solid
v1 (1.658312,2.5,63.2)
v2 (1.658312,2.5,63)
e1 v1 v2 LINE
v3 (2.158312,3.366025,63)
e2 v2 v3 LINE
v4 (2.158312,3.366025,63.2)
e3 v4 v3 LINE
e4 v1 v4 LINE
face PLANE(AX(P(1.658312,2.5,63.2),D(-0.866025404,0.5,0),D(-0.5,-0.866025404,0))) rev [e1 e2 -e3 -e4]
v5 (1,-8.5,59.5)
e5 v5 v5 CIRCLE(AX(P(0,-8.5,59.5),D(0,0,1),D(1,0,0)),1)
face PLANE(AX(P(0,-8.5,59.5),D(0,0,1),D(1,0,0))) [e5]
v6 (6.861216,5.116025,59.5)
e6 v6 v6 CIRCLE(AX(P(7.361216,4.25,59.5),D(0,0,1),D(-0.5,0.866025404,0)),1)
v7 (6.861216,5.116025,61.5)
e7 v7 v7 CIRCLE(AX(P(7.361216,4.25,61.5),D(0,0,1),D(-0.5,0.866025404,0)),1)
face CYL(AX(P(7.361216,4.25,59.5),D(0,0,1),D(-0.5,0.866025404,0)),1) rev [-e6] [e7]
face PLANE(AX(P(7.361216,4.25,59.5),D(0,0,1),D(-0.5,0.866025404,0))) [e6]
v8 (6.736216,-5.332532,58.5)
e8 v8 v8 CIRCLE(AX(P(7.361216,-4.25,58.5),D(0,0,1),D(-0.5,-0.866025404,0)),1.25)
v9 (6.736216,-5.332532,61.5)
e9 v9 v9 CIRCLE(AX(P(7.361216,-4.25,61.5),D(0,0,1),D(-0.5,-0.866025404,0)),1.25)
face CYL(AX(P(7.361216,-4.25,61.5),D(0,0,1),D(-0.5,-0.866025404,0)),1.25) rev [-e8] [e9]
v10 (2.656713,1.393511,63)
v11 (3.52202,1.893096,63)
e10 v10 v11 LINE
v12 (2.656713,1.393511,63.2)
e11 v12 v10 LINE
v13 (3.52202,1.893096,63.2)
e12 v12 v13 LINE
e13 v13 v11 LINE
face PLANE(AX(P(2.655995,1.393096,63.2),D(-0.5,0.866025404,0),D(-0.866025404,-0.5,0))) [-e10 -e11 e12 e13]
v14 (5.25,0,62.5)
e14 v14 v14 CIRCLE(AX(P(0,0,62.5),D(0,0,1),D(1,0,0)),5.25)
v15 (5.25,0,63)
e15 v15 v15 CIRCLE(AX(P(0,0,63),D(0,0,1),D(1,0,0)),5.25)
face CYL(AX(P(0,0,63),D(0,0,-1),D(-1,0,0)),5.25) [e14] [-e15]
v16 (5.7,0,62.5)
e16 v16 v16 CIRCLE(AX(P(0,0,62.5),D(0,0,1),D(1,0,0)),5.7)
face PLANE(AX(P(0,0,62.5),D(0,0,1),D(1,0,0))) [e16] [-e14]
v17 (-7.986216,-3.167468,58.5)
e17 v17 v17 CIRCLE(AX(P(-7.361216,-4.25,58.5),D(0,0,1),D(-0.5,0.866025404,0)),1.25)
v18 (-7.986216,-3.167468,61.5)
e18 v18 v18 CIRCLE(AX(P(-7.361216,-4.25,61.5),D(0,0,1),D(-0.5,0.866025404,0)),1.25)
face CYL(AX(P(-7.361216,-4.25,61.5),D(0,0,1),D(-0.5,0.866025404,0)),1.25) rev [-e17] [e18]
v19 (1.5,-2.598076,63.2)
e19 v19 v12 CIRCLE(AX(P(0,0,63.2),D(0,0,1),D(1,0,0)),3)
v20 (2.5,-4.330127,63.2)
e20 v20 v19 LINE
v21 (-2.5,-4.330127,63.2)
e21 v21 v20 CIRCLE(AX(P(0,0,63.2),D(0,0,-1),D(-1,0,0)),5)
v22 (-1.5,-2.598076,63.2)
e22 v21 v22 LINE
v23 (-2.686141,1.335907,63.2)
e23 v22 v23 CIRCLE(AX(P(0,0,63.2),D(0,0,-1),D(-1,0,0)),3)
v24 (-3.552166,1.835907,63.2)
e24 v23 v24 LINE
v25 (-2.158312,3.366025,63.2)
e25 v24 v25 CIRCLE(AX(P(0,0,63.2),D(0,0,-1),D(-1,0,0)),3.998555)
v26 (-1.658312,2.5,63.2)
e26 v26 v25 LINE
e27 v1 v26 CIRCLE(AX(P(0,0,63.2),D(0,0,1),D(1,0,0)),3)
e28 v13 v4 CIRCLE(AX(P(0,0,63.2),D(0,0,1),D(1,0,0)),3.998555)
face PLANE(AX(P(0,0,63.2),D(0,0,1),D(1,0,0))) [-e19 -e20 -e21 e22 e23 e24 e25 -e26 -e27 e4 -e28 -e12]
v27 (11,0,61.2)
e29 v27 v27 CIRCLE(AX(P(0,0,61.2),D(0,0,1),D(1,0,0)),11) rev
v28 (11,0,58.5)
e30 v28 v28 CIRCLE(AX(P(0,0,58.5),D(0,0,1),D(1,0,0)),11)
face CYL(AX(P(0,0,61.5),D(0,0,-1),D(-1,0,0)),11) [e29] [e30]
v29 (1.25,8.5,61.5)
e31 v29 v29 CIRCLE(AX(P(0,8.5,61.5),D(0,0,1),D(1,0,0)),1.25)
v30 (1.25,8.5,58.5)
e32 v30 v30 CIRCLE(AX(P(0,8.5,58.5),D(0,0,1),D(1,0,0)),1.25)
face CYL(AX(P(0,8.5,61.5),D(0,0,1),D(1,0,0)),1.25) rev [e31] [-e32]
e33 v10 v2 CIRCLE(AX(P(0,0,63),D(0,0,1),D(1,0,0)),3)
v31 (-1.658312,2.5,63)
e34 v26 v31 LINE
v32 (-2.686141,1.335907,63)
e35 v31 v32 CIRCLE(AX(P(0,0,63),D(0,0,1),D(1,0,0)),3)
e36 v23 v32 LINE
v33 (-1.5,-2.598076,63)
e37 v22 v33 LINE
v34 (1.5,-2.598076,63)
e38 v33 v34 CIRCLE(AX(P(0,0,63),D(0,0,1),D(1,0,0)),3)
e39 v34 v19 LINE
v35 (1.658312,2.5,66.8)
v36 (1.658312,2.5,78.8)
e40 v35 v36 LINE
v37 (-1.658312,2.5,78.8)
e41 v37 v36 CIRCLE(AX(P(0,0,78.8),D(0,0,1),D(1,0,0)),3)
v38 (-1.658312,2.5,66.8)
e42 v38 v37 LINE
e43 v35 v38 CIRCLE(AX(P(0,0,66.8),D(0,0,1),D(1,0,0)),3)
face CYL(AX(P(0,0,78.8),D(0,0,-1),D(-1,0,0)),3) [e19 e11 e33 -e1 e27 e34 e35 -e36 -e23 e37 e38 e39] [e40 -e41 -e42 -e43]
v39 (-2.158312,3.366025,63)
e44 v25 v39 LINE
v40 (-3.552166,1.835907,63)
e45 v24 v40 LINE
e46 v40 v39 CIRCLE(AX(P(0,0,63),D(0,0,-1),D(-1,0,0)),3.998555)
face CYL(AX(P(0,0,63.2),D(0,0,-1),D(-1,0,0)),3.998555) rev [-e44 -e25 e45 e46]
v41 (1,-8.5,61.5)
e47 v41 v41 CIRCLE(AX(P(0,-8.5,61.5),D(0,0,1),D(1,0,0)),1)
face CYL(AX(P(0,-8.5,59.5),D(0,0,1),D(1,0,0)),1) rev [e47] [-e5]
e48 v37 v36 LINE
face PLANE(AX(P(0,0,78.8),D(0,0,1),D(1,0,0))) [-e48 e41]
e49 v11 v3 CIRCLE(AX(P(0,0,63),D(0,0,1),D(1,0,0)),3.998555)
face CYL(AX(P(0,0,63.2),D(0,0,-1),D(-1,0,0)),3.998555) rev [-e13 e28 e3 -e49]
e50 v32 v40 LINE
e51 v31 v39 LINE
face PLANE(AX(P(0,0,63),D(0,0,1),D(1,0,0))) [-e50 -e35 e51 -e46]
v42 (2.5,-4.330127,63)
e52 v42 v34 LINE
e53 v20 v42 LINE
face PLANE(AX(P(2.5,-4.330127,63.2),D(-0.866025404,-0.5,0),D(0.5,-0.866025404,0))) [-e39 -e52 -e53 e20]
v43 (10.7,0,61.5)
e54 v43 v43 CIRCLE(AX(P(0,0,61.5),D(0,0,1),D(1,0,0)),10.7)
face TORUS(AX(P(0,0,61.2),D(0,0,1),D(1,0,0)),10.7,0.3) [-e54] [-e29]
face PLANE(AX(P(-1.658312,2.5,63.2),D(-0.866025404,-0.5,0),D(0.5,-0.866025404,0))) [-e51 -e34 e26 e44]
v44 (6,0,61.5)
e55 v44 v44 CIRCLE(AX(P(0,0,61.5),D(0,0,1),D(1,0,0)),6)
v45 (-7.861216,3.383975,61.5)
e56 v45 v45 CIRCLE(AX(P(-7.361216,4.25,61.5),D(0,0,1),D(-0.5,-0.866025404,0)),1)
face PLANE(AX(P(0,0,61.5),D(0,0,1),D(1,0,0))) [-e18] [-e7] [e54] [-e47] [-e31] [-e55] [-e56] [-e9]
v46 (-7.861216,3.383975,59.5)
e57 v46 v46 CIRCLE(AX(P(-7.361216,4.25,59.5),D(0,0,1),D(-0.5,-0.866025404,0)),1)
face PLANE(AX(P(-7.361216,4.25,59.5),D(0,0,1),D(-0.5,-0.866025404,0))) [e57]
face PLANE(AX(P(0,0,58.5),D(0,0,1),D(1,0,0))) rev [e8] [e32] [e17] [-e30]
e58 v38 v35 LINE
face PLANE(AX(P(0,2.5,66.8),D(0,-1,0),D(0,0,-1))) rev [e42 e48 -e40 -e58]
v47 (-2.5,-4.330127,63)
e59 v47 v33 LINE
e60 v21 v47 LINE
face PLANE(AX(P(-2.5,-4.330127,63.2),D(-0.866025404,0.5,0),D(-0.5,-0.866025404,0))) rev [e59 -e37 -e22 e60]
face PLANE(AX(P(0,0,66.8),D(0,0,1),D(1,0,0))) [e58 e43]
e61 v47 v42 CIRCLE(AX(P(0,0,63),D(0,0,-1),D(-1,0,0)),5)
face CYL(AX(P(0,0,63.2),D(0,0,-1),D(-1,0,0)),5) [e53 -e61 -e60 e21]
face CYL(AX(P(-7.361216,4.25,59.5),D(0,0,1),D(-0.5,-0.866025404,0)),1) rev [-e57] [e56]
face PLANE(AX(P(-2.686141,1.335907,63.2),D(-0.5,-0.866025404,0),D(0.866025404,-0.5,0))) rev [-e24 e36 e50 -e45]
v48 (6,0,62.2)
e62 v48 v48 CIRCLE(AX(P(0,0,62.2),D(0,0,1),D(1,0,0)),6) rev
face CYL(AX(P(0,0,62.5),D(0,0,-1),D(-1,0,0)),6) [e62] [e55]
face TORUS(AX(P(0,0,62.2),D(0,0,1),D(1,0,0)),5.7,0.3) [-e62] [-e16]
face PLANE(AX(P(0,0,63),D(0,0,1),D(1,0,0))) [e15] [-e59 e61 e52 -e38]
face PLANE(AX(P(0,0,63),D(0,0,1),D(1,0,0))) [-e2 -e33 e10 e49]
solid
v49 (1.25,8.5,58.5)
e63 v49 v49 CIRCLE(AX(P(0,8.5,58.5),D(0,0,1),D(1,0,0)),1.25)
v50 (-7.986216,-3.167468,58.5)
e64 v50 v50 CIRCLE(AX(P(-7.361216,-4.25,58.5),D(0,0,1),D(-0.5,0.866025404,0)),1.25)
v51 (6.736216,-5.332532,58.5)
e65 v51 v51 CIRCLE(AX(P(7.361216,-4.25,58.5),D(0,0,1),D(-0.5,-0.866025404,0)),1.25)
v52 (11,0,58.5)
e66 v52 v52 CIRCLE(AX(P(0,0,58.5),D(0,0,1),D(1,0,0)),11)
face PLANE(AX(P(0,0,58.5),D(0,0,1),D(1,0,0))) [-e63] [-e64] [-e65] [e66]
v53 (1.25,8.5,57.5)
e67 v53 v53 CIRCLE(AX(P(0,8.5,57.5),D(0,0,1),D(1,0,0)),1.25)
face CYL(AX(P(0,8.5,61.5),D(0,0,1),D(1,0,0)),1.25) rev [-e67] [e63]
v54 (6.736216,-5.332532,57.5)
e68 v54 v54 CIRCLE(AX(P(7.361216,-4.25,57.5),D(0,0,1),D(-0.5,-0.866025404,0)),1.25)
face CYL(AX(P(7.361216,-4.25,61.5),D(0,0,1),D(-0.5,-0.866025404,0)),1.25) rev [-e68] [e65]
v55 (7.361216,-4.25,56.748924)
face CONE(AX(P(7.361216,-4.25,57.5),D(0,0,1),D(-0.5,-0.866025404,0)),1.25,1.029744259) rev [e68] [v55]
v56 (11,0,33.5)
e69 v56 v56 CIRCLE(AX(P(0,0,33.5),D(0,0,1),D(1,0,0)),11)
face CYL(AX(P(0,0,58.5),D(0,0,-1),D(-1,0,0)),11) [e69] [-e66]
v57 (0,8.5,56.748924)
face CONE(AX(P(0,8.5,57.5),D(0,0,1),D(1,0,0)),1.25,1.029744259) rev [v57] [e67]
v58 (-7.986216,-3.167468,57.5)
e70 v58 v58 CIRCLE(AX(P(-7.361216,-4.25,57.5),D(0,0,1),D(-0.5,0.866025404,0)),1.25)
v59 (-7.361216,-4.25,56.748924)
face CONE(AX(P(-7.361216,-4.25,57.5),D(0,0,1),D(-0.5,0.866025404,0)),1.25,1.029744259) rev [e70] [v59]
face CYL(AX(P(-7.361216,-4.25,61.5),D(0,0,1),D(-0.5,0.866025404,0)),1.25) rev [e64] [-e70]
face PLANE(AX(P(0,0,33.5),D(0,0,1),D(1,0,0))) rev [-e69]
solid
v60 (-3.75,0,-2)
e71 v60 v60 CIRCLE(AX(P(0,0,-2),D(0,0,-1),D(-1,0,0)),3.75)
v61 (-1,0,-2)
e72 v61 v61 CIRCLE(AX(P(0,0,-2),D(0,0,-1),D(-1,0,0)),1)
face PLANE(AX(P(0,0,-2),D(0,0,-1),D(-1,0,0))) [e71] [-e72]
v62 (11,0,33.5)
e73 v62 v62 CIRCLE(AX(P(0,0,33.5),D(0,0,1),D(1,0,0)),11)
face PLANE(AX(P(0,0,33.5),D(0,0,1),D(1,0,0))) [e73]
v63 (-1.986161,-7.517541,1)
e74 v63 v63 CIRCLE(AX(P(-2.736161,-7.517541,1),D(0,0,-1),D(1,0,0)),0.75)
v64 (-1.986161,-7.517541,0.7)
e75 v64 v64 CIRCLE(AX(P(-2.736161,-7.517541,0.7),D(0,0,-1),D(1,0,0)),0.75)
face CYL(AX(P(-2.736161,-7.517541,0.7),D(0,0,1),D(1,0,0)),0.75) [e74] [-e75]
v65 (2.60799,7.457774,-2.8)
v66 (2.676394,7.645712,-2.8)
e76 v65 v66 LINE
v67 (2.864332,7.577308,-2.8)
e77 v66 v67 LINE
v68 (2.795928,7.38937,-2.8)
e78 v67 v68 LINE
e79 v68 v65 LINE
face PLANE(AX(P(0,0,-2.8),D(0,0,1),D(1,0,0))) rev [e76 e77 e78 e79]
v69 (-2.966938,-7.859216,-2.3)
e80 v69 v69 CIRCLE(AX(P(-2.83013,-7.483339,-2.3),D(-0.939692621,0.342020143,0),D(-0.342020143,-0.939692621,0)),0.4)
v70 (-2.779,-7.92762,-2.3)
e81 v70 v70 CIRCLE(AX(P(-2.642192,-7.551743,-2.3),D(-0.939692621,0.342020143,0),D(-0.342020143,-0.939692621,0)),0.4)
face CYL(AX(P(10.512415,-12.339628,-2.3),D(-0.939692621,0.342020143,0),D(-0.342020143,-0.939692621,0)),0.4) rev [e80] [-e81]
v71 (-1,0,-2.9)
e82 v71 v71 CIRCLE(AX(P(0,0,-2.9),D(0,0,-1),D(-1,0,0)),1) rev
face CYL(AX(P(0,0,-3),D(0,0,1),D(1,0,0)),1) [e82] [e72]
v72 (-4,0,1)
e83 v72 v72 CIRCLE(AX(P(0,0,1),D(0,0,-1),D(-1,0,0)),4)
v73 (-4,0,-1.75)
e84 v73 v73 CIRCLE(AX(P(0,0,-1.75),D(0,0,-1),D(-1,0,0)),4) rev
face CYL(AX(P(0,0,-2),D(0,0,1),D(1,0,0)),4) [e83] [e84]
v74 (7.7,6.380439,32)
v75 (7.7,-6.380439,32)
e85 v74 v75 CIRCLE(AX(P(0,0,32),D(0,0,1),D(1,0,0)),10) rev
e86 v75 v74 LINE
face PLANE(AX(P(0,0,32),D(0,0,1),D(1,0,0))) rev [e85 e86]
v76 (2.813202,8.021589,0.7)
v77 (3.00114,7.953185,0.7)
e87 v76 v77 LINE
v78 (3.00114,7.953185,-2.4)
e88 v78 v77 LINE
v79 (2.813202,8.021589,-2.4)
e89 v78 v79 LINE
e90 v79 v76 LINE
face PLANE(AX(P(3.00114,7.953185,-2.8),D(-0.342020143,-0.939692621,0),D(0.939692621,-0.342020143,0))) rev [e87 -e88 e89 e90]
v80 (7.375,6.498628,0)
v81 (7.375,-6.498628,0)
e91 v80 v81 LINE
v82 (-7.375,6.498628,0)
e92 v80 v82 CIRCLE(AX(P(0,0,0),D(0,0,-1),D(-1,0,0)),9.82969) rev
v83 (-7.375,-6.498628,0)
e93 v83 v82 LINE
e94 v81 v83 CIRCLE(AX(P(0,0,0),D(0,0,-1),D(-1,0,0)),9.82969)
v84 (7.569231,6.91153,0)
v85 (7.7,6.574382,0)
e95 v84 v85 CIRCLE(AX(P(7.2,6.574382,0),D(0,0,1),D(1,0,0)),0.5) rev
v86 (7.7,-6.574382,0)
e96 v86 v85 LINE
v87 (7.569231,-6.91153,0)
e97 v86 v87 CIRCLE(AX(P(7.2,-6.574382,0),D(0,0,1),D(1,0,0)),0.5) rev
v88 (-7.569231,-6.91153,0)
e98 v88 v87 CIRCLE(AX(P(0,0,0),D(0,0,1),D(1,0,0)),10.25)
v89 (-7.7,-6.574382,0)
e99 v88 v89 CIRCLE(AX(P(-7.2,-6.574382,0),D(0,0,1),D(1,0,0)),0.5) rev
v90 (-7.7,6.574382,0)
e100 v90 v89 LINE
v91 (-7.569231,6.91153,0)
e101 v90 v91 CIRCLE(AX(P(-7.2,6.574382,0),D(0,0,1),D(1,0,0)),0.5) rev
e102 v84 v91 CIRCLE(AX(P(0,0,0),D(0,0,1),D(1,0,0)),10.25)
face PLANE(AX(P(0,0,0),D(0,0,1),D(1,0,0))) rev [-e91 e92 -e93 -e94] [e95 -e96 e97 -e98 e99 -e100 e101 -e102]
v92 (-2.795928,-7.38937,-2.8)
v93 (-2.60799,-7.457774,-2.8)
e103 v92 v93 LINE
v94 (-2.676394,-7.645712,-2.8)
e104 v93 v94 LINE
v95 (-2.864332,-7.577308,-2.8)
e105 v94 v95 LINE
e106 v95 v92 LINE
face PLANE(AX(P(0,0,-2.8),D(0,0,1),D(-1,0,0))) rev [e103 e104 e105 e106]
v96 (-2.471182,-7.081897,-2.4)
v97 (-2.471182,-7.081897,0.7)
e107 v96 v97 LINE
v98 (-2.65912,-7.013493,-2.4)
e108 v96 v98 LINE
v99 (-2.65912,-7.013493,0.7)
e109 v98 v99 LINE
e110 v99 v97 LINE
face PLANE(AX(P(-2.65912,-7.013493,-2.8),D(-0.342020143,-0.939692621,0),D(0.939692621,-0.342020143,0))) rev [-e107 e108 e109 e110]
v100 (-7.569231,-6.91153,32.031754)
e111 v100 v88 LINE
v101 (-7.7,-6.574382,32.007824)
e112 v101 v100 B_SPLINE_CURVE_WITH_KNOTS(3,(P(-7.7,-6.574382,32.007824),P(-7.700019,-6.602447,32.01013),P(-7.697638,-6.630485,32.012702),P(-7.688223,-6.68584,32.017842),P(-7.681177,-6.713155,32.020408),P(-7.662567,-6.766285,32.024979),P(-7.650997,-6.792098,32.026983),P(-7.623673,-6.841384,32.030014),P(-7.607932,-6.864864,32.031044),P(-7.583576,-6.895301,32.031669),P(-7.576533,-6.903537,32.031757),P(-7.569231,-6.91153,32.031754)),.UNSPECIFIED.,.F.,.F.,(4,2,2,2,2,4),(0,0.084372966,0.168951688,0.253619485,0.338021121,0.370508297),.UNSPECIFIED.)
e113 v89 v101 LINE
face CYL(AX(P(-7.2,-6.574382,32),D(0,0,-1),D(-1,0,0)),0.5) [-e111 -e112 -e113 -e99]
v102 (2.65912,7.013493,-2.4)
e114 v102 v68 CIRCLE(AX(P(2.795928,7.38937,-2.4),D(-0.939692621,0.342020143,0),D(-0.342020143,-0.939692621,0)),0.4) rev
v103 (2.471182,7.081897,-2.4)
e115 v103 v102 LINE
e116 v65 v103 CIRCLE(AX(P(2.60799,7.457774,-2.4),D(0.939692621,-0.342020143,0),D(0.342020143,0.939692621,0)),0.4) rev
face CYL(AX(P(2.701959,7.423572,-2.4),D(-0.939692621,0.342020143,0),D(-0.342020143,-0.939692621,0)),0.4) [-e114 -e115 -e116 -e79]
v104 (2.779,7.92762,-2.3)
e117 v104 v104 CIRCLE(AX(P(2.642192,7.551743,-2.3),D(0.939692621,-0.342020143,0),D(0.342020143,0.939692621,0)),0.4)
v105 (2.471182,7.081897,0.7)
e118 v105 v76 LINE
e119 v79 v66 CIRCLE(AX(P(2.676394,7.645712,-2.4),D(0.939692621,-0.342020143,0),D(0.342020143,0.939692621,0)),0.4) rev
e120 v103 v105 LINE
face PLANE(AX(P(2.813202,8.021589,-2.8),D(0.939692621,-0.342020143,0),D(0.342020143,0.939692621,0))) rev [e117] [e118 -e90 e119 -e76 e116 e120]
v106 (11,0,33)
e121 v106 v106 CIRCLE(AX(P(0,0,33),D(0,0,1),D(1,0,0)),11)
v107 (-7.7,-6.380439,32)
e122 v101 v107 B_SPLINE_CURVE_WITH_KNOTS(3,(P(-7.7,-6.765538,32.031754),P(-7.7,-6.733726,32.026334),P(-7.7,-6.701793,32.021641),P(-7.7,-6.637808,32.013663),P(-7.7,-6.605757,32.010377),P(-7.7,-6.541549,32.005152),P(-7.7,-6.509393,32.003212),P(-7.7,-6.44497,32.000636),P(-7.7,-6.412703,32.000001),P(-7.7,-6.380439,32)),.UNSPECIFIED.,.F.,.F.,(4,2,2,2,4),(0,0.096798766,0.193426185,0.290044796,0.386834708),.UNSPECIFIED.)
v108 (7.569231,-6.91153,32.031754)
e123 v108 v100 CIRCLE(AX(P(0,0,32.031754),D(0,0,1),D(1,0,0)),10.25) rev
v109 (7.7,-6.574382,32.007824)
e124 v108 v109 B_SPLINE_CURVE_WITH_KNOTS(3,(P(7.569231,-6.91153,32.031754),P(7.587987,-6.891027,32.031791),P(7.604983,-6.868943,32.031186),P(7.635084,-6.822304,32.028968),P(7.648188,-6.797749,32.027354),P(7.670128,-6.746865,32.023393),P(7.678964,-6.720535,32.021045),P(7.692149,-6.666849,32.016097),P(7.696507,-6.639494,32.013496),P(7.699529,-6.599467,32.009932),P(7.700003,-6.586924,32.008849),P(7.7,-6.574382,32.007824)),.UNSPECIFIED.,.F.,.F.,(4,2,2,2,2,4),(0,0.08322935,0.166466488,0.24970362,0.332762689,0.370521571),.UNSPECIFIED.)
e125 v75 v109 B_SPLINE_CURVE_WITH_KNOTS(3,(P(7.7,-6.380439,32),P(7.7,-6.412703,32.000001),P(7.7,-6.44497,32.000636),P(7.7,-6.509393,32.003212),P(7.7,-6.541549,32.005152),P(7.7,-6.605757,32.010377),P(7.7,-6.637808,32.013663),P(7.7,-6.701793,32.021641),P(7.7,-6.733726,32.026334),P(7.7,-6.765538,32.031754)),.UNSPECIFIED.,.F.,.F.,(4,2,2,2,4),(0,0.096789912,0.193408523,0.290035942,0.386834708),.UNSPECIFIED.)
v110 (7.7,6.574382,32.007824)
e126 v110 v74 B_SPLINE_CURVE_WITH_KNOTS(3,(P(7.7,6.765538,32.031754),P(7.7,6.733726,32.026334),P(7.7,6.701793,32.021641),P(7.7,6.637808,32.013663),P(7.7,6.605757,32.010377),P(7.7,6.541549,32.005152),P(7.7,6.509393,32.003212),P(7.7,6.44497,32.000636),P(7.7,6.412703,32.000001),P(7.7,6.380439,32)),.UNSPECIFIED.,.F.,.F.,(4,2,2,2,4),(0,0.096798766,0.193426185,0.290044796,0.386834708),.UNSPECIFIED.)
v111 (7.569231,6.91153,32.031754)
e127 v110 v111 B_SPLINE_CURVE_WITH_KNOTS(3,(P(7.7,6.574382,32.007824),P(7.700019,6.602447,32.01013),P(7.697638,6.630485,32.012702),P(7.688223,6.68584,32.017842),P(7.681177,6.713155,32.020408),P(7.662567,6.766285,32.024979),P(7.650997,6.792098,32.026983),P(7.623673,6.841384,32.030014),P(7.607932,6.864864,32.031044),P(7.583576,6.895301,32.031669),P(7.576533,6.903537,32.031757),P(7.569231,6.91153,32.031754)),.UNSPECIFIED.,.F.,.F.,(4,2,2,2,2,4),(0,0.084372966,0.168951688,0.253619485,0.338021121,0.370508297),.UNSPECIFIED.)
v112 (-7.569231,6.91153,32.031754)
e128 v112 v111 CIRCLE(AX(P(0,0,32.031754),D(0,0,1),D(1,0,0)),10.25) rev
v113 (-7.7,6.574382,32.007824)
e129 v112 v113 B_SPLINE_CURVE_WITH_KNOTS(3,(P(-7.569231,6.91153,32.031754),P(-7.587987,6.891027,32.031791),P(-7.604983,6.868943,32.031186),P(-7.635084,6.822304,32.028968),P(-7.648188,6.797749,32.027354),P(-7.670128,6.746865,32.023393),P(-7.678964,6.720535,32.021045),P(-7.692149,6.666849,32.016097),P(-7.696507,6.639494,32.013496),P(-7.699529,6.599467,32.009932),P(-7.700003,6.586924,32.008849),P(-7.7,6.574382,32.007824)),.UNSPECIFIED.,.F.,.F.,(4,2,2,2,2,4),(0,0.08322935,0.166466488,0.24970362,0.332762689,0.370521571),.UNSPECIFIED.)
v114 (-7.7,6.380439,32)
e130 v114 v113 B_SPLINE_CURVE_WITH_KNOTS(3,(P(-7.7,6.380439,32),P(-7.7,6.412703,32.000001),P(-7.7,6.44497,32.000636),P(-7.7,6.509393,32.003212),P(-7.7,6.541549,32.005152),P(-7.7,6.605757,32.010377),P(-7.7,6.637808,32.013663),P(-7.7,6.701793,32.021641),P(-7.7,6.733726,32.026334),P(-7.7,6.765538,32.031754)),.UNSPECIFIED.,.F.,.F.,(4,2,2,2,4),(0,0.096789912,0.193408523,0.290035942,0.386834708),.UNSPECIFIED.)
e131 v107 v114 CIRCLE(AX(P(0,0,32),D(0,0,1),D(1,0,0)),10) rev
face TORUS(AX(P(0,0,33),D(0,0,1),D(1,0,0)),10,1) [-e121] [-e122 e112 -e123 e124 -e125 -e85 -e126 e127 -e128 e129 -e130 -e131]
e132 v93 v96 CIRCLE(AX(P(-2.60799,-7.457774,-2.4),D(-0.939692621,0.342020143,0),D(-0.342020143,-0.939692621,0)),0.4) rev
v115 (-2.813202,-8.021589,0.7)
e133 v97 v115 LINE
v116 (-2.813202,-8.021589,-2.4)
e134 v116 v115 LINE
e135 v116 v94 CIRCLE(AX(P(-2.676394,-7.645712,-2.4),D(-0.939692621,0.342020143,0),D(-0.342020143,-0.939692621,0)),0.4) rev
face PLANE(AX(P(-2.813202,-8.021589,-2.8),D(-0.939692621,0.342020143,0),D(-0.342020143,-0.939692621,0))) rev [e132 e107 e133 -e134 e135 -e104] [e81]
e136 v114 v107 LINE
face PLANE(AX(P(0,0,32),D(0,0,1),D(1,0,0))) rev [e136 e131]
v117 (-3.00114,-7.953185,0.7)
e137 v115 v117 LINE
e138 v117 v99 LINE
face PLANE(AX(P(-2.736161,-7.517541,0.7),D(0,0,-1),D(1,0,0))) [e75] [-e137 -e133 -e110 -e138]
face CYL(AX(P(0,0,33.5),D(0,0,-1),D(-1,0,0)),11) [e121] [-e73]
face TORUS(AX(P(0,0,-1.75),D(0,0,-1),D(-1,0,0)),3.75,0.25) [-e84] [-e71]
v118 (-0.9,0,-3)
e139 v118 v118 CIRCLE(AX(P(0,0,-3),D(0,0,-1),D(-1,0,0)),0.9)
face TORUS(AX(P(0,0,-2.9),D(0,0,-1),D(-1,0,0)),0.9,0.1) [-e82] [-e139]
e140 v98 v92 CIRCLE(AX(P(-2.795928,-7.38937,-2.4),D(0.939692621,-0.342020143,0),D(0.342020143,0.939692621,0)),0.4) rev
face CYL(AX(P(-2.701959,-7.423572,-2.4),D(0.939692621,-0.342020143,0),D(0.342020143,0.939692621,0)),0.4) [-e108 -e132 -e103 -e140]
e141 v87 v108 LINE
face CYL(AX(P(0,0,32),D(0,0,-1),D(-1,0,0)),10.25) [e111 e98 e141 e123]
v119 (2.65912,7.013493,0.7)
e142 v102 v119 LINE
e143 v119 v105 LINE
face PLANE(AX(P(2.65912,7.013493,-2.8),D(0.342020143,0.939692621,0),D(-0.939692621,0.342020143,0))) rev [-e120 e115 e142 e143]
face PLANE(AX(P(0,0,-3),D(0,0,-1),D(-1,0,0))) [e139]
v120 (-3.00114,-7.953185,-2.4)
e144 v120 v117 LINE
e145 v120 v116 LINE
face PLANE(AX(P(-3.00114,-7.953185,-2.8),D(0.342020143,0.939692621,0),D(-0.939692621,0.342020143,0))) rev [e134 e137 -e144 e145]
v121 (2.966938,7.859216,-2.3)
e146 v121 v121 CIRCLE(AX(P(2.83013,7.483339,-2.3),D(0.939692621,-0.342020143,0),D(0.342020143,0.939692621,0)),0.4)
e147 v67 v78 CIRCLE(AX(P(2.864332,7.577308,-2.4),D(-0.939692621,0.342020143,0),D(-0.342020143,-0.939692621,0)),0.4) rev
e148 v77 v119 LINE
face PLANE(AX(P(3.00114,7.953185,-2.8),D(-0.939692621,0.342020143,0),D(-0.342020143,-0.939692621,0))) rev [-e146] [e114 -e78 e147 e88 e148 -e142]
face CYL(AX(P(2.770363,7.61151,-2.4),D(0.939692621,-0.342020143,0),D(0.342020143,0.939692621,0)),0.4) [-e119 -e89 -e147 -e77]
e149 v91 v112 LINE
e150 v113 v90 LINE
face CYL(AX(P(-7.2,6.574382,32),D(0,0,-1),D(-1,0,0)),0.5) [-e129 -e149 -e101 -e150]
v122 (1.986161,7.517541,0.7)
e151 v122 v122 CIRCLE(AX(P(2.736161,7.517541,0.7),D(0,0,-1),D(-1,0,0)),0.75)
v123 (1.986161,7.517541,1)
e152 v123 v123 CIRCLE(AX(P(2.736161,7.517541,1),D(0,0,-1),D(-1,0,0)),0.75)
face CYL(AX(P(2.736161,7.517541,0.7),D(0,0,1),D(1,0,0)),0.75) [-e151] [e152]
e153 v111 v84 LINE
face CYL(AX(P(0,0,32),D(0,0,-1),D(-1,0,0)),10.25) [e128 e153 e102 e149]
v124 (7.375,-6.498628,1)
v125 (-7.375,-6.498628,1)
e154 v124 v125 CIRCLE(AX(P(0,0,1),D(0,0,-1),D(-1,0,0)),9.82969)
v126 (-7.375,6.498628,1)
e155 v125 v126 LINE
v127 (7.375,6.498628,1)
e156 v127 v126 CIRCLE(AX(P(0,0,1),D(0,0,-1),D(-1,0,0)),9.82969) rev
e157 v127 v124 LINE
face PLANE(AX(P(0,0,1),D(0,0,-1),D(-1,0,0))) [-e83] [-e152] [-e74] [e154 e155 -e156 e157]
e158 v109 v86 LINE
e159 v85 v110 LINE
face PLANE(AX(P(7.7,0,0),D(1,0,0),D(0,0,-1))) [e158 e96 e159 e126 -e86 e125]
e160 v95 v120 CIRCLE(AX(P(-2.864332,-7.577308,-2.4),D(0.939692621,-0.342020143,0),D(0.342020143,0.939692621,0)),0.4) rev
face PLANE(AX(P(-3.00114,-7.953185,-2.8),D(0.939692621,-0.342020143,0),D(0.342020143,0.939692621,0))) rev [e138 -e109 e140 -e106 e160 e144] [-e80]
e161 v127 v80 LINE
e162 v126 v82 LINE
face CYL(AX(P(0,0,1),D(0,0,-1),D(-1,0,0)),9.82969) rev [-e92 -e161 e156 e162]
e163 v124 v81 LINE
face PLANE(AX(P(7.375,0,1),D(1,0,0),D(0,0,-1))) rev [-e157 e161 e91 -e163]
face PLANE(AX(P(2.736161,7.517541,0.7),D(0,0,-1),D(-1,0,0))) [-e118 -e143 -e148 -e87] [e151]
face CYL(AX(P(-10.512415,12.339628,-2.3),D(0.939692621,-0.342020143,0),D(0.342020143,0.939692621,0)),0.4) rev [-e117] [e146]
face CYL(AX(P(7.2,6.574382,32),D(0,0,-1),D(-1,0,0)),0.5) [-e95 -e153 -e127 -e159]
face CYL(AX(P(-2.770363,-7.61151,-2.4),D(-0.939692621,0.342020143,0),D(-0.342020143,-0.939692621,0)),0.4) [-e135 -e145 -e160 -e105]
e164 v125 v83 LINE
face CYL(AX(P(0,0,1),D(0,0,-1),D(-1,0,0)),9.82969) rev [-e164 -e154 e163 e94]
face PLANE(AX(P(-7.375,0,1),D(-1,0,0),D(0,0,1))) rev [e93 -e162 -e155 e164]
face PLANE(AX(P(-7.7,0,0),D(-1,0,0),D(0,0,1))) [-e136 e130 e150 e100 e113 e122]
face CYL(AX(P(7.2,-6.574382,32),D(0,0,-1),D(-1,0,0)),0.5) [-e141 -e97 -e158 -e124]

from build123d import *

# Parameters (mm, degrees)
SKETCH_1_R                       = 10.25
EXTRUDE_1_DEPTH                  = 32
CUT_EXTRUDE_1_DEPTH              = 36.130115286
CUT_EXTRUDE_1_DEPTH_BACK         = 36.130115286
SKETCH_3_R                       = 11
EXTRUDE_2_DEPTH                  = 1.5
SKETCH_4_R                       = 11
EXTRUDE_3_DEPTH                  = 25
SKETCH_5_R                       = 11
EXTRUDE_4_DEPTH                  = 3
SKETCH_6_R                       = 6
EXTRUDE_5_DEPTH                  = 1
FILLET_START                     = 32
FILLET_1_2_DEPTH                 = 1
FILLET_2_R                       = 0.3
FILLET_3_R                       = 0.5
SKETCH_7_R                       = 5.25
EXTRUDE_6_DEPTH                  = 0.5
SKETCH_8_R                       = 3
EXTRUDE_7_DEPTH                  = 15.8
CUT_EXTRUDE_2_DEPTH              = 12
EXTRUDE_8_DEPTH                  = 0.2
PATTERN_CIRCULAR_1_COUNT         = 3
SKETCH_15_R                      = 1
CUT_EXTRUDE_3_DEPTH              = 2
PATTERN_CIRCULAR_2_COUNT         = 3
CUT_EXTRUDE_4_DEPTH              = 1
SKETCH_24_R                      = 4
EXTRUDE_9_DEPTH                  = 3
SKETCH_25_R                      = 1
EXTRUDE_10_DEPTH                 = 1
FILLET_4_R                       = 0.25
FILLET_5_R                       = 0.1
SKETCH_26_R                      = 0.75
EXTRUDE_11_DEPTH                 = 0.3
EXTRUDE_12_DEPTH                 = 3.5
SKETCH_28_R                      = 0.4
CUT_EXTRUDE_5_DEPTH              = 81.338470066
FILLET_6_R                       = 0.4
PATTERN_CIRCULAR_7_COUNT         = 2
FILLET_6_OF_PATTERN_CIRCULAR_7_R = 0.4


with BuildPart() as part:
    # 草圖1 → 填料-伸長1 (new body)
    with BuildSketch(Plane.XY):
        Circle(SKETCH_1_R)
    extrude(amount=EXTRUDE_1_DEPTH)

    # 草圖2 → 除料-伸長1 (cut, two sides: drawn at the far end of the back side and taken through both)
    with BuildSketch(Plane.XY.offset(32).offset(-CUT_EXTRUDE_1_DEPTH_BACK)):
        with BuildLine():
            Line((-7.7, -6.765537673), (-7.7, 6.765537673))
            ThreePointArc((-7.7, 6.765537673), (-10.25, 0), (-7.7, -6.765537673))
        make_face()
        with BuildLine():
            ThreePointArc((10.25, 0), (9.591337237, 3.615072613), (7.7, 6.765537673))
            Line((7.7, 6.765537673), (7.7, -6.765537673))
            ThreePointArc((7.7, -6.765537673), (9.591337237, -3.615072613), (10.25, 0))
        make_face()
    extrude(amount=CUT_EXTRUDE_1_DEPTH + CUT_EXTRUDE_1_DEPTH_BACK, mode=Mode.SUBTRACT)

    # 草圖3 → 填料-伸長2 (add)
    with BuildSketch(Plane.XY.offset(32)):
        Circle(SKETCH_3_R)
    extrude(amount=EXTRUDE_2_DEPTH)

    # 圓角1: read off the stored shape, not the designer's step
    # 圓角1 outline → 圓角1 (revolve, cut)
    with BuildSketch(Plane.XZ):
        with BuildLine():
            ThreePointArc((11, 33), (10.707106781, 32.292893219), (10, 32))
            Line((10, 32), (11, 32))
            Line((11, 32), (11, 33))
        make_face()
    revolve(axis=Axis((0, 0, 0), (0, 0, 1)), mode=Mode.SUBTRACT)

    # Fillet 1 2 outline → Fillet 1 2 (add)
    with BuildSketch(Plane.XY.offset(FILLET_START)):
        with BuildLine():
            ThreePointArc((7.7, 6.765537673), (0, 10.25), (-7.7, 6.765537673))
            Line((-7.7, 6.765537673), (-7.7, -6.765537673))
            ThreePointArc((-7.7, -6.765537673), (0, -10.25), (7.7, -6.765537673))
            Line((7.7, -6.765537673), (7.7, 6.765537673))
        make_face()
    extrude(amount=FILLET_1_2_DEPTH)

    # 圓角3
    fillet_3_edges = [part.edges().sort_by_distance(p)[0] for p in [
        (-7.7, 6.765537673, 16),
        (-7.7, -6.765537673, 16),
        (7.7, -6.765537673, 16),
        (7.7, 6.765537673, 16),
    ]]
    fillet(fillet_3_edges, radius=FILLET_3_R)

    # 草圖23 → 除料-伸長4 (cut)
    with BuildSketch(Plane(origin=(0, 0, 0), x_dir=(-1, 0, 0), z_dir=(0, 0, -1))):
        with BuildLine():
            Line((-7.375, 6.498628393), (-7.375, -6.498628393))
            ThreePointArc((-7.375, -6.498628393), (0, -9.829689516), (7.375, -6.498628393))
            Line((7.375, -6.498628393), (7.375, 6.498628393))
            ThreePointArc((7.375, 6.498628393), (0, 9.829689516), (-7.375, 6.498628393))
        make_face()
    extrude(amount=-CUT_EXTRUDE_4_DEPTH, mode=Mode.SUBTRACT)

    # 草圖24 → 填料-伸長9 (add)
    with BuildSketch(Plane(origin=(0, 0, 1), x_dir=(-1, 0, 0), z_dir=(0, 0, -1))):
        Circle(SKETCH_24_R)
    extrude(amount=EXTRUDE_9_DEPTH)

    # 草圖25 → 填料-伸長10 (add)
    with BuildSketch(Plane(origin=(0, 0, -2), x_dir=(-1, 0, 0), z_dir=(0, 0, -1))):
        Circle(SKETCH_25_R)
    extrude(amount=EXTRUDE_10_DEPTH)

    # 圓角4
    fillet_4_edges = [part.edges().sort_by_distance(p)[0] for p in [
        (4, 0, -2),
    ]]
    fillet(fillet_4_edges, radius=FILLET_4_R)

    # 圓角5
    fillet_5_edges = [part.edges().sort_by_distance(p)[0] for p in [
        (1, 0, -3),
    ]]
    fillet(fillet_5_edges, radius=FILLET_5_R)

    # 草圖26 → 填料-伸長11 (add)
    with BuildSketch(Plane(origin=(0, 0, 1), x_dir=(-1, 0, 0), z_dir=(0, 0, -1))):
        with Locations((-2.736161147, 7.517540966)):
            Circle(SKETCH_26_R)
    extrude_11 = extrude(amount=EXTRUDE_11_DEPTH)

    # 草圖27 → 填料-伸長12 (add)
    with BuildSketch(Plane(origin=(0, 0, 0.7), x_dir=(-1, 0, 0), z_dir=(0, 0, -1))):
        Polygon((-3.00114048, 7.953185262), (-2.659120337, 7.013492642), (-2.471181813, 7.08189667), (-2.813201956, 8.021589291), align=None)
    extrude_12 = extrude(amount=EXTRUDE_12_DEPTH)

    # 草圖28 → 除料-伸長5 (cut, through all)
    with BuildSketch(Plane(origin=(0.093969262, -0.034202014, 0), x_dir=(0, 0, -1), z_dir=(0.9396926207859105, -0.3420201433256633, 0))):
        with Locations(Location((2.3, 8, 0), (0, 0, 90))):
            Circle(SKETCH_28_R)
    cut_extrude_5 = extrude(amount=-CUT_EXTRUDE_5_DEPTH, mode=Mode.SUBTRACT)

    # 圓角6
    fillet_6_edges = [part.edges().sort_by_distance(p)[0] for p in [
        (2.907171218, 7.987387277, -2.8),
        (2.565151075, 7.047694656, -2.8),
    ]]
    fillet(fillet_6_edges, radius=FILLET_6_R)

    # 環狀複製排列7: 填料-伸長11, 填料-伸長12, 除料-伸長5 ×2 about axis
    pattern_circular_7_axis = Axis((0, 0, 0), (0, 0, 1))
    add([extrude_11.rotate(pattern_circular_7_axis, i * 360 / PATTERN_CIRCULAR_7_COUNT) for i in range(1, PATTERN_CIRCULAR_7_COUNT)])
    add([extrude_12.rotate(pattern_circular_7_axis, i * 360 / PATTERN_CIRCULAR_7_COUNT) for i in range(1, PATTERN_CIRCULAR_7_COUNT)])
    add([cut_extrude_5.rotate(pattern_circular_7_axis, i * 360 / PATTERN_CIRCULAR_7_COUNT) for i in range(1, PATTERN_CIRCULAR_7_COUNT)], mode=Mode.SUBTRACT)

    # 圓角6 of 環狀複製排列7
    fillet_6_of_pattern_circular_7_edges = [part.edges().sort_by_distance(p)[0] for p in [
        (-2.907171218, -7.987387277, -2.8),
        (-2.565151075, -7.047694656, -2.8),
    ]]
    fillet(fillet_6_of_pattern_circular_7_edges, radius=FILLET_6_OF_PATTERN_CIRCULAR_7_R)


with BuildPart() as body_2:
    # 草圖4 → 填料-伸長3 (new body)
    with BuildSketch(Plane.XY.offset(33.5)):
        Circle(SKETCH_4_R)
    extrude(amount=EXTRUDE_3_DEPTH)


with BuildPart() as body_3:
    # 草圖5 → 填料-伸長4 (new body)
    with BuildSketch(Plane.XY.offset(58.5)):
        Circle(SKETCH_5_R)
    extrude(amount=EXTRUDE_4_DEPTH)

    # 草圖6 → 填料-伸長5 (add)
    with BuildSketch(Plane.XY.offset(61.5)):
        Circle(SKETCH_6_R)
    extrude(amount=EXTRUDE_5_DEPTH)

    # 圓角2
    fillet_2_edges = [body_3.edges().sort_by_distance(p)[0] for p in [
        (-11, 0, 61.5),
        (-6, 0, 62.5),
    ]]
    fillet(fillet_2_edges, radius=FILLET_2_R)

    # 草圖7 → 填料-伸長6 (add)
    with BuildSketch(Plane.XY.offset(62.5)):
        Circle(SKETCH_7_R)
    extrude(amount=EXTRUDE_6_DEPTH)

    # 草圖8 → 填料-伸長7 (add)
    with BuildSketch(Plane.XY.offset(63)):
        Circle(SKETCH_8_R)
    extrude(amount=EXTRUDE_7_DEPTH)

    # 草圖9 → 除料-伸長2 (cut)
    with BuildSketch(Plane.XY.offset(78.8)):
        with BuildLine():
            Line((-1.658312395, 2.5), (1.658312395, 2.5))
            ThreePointArc((1.658312395, 2.5), (0, 3), (-1.658312395, 2.5))
        make_face()
    extrude(amount=-CUT_EXTRUDE_2_DEPTH, mode=Mode.SUBTRACT)

    # 草圖10 → 填料-伸長8 (add)
    with BuildSketch(Plane.XY.offset(63)):
        with BuildLine():
            Line((-2.5, -4.330127019), (-1.5, -2.598076211))
            ThreePointArc((-1.5, -2.598076211), (-2.872281323, -0.866025404), (-2.686140662, 1.335907312))
            Line((-2.686140662, 1.335907312), (-3.552166065, 1.835907312))
            ThreePointArc((-3.552166065, 1.835907312), (-2.955961165, 2.692718516), (-2.158312395, 3.366025404))
            Line((-2.158312395, 3.366025404), (-1.658312395, 2.5))
            ThreePointArc((-1.658312395, 2.5), (0, 3), (1.658312395, 2.5))
            Line((1.658312395, 2.5), (2.158312395, 3.366025404))
            ThreePointArc((2.158312395, 3.366025404), (2.934096825, 2.716526318), (3.52202007, 1.893096416))
            Line((3.52202007, 1.893096416), (2.655994666, 1.393096416))
            ThreePointArc((2.655994666, 1.393096416), (2.880649779, -0.834794671), (1.499585384, -2.597358075))
            Line((1.499585384, -2.597358075), (2.5, -4.330127019))
            ThreePointArc((2.5, -4.330127019), (0, 5), (-2.5, -4.330127019))
        make_face()
    extrude(amount=EXTRUDE_8_DEPTH)


with BuildPart() as m3x0_5_1_tool:
    # 草圖14 → M3x0.5 螺紋孔1 (revolve)
    with BuildSketch(Plane(origin=(0, 8.5, 61.5), x_dir=(0, -1, 0), z_dir=(1, 0, 0))):
        Polygon((0, 0), (0, 4.751075774), (1.25, 4), (1.25, 0), align=None)
    m3x0_5_1 = revolve(axis=Axis((0, 8.5, 67.85), (0, 0, -1)))


with BuildPart() as body_2_1:
    add(body_2.part)

    # M3x0.5 螺紋孔1: cut by m3x0_5_1_tool
    add(m3x0_5_1_tool.part, mode=Mode.SUBTRACT)


with BuildPart() as body_3_1:
    add(body_3.part)

    # M3x0.5 螺紋孔1: cut by m3x0_5_1_tool
    add(m3x0_5_1_tool.part, mode=Mode.SUBTRACT)


with BuildPart() as pattern_circular_1_tool:
    # 環狀複製排列1: M3x0.5 螺紋孔1 ×3 about axis
    pattern_circular_1_axis = Axis((0, 0, 0), (0, 0, 1))
    for i in range(1, PATTERN_CIRCULAR_1_COUNT):
        add(m3x0_5_1.rotate(pattern_circular_1_axis, i * 360 / PATTERN_CIRCULAR_1_COUNT))


with BuildPart() as body_2_2:
    add(body_2_1.part)

    # 環狀複製排列1: cut by pattern_circular_1_tool
    add(pattern_circular_1_tool.part, mode=Mode.SUBTRACT)


with BuildPart() as body_3_2:
    add(body_3_1.part)

    # 環狀複製排列1: cut by pattern_circular_1_tool
    add(pattern_circular_1_tool.part, mode=Mode.SUBTRACT)

    # 草圖15 → 除料-伸長3 (cut)
    with BuildSketch(Plane.XY.offset(61.5)):
        with Locations((0, -8.5)):
            Circle(SKETCH_15_R)
    cut_extrude_3 = extrude(amount=-CUT_EXTRUDE_3_DEPTH, mode=Mode.SUBTRACT)

    # 環狀複製排列2: 除料-伸長3 ×3 about axis
    pattern_circular_2_axis = Axis((0, 0, 0), (0, 0, 1))
    for i in range(1, PATTERN_CIRCULAR_2_COUNT):
        add(cut_extrude_3.rotate(pattern_circular_2_axis, i * 360 / PATTERN_CIRCULAR_2_COUNT), mode=Mode.SUBTRACT)


solid = Compound([part.part, body_2_2.part, body_3_2.part])
